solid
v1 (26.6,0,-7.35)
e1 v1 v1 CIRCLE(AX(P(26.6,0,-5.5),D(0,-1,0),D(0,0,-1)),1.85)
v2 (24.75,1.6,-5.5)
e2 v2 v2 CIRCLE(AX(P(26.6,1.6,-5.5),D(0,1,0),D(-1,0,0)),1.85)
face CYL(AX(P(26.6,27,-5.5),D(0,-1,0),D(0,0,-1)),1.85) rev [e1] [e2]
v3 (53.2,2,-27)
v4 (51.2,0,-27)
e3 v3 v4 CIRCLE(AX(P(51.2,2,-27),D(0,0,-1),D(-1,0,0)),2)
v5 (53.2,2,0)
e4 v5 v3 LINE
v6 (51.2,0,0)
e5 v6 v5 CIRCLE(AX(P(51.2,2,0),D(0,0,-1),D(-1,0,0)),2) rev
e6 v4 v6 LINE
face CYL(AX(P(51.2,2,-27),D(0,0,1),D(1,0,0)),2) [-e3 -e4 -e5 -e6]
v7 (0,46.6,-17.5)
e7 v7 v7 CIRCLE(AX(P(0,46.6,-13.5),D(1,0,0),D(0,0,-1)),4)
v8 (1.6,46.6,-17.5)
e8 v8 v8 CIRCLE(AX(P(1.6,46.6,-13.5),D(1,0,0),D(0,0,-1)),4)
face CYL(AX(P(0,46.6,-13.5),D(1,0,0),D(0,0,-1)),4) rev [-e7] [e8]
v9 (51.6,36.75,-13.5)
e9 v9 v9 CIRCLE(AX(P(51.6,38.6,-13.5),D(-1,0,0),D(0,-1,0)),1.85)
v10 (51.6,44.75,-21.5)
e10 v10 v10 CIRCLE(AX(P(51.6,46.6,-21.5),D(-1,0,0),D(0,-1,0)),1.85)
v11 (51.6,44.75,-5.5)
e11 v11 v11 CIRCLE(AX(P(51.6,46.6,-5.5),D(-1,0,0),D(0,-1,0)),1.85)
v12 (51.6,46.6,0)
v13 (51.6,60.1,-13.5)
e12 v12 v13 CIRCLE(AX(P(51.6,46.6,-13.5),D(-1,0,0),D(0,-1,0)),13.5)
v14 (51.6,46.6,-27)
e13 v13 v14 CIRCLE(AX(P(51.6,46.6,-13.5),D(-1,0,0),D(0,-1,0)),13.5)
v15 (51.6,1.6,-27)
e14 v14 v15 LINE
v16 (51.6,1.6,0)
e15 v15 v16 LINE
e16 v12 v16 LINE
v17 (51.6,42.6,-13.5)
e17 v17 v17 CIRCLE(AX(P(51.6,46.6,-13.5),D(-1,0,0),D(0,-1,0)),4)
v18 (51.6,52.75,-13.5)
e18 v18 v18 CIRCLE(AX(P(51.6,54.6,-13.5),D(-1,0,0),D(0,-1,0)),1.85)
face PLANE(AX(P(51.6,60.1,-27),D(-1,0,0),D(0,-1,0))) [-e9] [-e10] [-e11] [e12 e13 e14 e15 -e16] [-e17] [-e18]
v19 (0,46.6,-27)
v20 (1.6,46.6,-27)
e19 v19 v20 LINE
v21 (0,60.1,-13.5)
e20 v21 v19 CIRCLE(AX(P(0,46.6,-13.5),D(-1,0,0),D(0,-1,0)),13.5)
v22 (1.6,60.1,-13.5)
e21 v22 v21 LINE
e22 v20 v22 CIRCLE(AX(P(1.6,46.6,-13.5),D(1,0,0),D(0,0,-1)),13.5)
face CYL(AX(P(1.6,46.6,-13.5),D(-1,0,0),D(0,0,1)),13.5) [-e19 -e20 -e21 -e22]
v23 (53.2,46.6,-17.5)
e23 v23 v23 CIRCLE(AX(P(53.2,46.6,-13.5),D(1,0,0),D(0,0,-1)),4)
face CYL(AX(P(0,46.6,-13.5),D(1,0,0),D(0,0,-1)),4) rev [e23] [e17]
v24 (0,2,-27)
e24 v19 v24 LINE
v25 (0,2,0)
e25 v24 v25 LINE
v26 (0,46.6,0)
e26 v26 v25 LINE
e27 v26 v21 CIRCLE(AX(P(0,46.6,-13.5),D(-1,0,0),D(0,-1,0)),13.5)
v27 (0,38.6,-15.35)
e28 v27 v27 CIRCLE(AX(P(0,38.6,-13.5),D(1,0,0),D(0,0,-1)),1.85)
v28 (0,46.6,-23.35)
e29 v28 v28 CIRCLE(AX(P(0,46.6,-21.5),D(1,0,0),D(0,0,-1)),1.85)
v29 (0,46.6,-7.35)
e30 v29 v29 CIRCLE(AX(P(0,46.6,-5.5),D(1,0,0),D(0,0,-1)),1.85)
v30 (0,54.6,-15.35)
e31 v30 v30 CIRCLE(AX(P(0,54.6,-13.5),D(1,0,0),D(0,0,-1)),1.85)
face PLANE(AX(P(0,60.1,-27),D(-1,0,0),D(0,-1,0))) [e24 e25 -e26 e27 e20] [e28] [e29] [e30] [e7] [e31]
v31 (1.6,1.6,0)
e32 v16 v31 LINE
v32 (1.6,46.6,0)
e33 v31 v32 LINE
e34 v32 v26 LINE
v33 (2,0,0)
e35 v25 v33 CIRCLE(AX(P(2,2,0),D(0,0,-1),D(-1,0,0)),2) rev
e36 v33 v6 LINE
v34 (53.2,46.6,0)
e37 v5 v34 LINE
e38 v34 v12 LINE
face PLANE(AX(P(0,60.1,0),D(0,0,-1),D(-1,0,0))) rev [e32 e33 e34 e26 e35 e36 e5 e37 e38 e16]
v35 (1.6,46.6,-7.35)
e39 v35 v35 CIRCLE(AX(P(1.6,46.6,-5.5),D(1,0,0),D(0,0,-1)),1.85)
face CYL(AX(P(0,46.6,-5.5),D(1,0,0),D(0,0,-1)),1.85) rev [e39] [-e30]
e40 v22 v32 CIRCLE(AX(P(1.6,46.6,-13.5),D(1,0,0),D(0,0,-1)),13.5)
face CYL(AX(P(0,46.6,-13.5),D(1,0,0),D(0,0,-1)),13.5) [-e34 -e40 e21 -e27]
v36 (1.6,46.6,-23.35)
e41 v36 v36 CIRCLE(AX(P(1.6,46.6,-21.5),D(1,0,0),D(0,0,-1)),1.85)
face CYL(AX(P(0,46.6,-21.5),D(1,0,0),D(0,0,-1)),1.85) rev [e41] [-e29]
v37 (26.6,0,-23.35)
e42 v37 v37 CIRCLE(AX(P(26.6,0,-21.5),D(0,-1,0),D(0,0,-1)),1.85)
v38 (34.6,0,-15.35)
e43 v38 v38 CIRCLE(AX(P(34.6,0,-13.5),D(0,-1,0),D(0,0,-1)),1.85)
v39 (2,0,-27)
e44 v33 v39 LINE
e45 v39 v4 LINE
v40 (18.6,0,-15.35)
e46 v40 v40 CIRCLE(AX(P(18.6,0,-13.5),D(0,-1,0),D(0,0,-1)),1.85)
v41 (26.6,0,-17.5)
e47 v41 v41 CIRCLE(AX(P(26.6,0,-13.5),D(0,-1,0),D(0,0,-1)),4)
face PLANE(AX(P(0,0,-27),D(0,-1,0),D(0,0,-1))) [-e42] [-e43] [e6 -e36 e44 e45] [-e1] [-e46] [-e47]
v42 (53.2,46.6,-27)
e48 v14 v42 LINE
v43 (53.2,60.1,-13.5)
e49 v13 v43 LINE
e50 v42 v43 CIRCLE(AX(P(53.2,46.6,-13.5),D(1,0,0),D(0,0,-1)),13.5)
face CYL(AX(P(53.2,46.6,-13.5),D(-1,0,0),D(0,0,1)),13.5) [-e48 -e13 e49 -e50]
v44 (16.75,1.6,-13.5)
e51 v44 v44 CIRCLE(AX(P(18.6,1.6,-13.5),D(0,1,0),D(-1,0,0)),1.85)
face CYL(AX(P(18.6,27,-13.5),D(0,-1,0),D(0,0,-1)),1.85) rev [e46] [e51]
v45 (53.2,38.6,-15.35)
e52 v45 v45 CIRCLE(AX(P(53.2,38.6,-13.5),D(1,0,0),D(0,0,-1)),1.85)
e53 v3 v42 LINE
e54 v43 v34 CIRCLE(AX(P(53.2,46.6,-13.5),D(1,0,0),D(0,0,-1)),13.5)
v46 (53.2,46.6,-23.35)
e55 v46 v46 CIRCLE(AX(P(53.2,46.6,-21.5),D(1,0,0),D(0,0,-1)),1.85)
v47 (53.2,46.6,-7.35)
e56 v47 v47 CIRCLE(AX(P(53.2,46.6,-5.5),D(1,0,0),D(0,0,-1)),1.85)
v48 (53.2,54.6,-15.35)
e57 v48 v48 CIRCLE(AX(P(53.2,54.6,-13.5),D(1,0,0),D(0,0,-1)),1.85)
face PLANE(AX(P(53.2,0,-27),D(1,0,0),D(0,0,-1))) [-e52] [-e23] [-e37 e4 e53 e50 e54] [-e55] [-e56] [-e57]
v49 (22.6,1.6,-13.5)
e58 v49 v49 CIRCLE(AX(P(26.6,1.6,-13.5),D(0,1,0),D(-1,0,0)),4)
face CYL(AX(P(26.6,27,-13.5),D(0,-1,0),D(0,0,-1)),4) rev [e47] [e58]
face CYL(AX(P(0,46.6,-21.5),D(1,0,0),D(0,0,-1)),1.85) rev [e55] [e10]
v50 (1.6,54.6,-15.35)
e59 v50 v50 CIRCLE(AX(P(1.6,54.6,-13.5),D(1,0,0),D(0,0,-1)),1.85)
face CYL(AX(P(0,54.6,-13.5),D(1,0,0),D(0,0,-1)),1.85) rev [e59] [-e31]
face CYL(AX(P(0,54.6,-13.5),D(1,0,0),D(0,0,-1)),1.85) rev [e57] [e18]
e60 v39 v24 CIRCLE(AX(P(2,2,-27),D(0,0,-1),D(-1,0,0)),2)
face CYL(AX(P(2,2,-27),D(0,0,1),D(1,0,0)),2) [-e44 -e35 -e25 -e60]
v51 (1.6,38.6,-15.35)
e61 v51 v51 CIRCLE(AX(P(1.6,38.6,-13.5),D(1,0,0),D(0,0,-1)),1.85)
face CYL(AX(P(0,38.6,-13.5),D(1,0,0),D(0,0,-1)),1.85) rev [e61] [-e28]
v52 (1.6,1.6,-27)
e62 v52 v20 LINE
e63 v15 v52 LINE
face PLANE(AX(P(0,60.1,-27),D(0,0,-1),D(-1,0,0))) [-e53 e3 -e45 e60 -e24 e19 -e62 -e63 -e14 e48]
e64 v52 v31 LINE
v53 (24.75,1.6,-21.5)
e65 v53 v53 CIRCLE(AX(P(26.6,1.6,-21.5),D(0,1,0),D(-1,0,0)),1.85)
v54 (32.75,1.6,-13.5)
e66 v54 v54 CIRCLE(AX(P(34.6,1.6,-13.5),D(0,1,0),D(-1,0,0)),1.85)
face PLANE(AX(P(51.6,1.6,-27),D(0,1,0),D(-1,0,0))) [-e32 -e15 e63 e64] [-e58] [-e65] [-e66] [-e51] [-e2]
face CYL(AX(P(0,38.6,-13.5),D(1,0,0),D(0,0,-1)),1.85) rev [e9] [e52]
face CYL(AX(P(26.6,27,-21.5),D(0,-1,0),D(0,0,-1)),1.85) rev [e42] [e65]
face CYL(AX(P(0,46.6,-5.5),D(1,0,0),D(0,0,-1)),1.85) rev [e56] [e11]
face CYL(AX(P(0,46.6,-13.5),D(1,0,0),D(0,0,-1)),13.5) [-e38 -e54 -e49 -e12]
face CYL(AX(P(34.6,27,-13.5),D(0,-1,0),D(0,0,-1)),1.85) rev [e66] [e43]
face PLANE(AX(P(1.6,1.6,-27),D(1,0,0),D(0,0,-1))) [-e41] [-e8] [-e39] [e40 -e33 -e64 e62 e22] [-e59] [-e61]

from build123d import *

# Parameters (mm, degrees)
EXTRUDE1_DEPTH           = 27
FILLET2_R                = 13.5
FILLET3_R                = 13.5
FILLET4_R                = 13.5
FILLET5_R                = 13.5
CUT_EXTRUDE1_START       = -53.2
CUT_EXTRUDE1_OUTLINE_R   = 4
CUT_EXTRUDE1_OUTLINE_R_2 = 1.85
CUT_EXTRUDE1_DEPTH       = 53.2
CUT_EXTRUDE2_START       = -1.6
CUT_EXTRUDE2_OUTLINE_R   = 4
CUT_EXTRUDE2_OUTLINE_R_2 = 1.85
CUT_EXTRUDE2_DEPTH       = 1.6
FILLET6_R                = 2
FILLET7_R                = 2


# Read off the part's stored shape, not the designer's step: Cut-Extrude1, Cut-Extrude2
with BuildPart() as part:
    # Sketch1 → Extrude1 (new body)
    with BuildSketch(Plane.XY):
        Polygon((0, 0), (53.2, 0), (53.2, 60.1), (51.6, 60.1), (51.6, 1.6), (1.6, 1.6), (1.6, 60.1), (0, 60.1), align=None)
    extrude(amount=-EXTRUDE1_DEPTH)

    # Fillet2
    fillet2_edges = [part.edges().sort_by_distance(p)[0] for p in [
        (52.4, 60.1, 0),
    ]]
    fillet(fillet2_edges, radius=FILLET2_R)

    # Fillet3
    fillet3_edges = [part.edges().sort_by_distance(p)[0] for p in [
        (52.4, 60.1, -27),
    ]]
    fillet(fillet3_edges, radius=FILLET3_R - 0.0001)  # a hair under: the kernel refuses the full size

    # Fillet4
    fillet4_edges = [part.edges().sort_by_distance(p)[0] for p in [
        (0.8, 60.1, -27),
    ]]
    fillet(fillet4_edges, radius=FILLET4_R)

    # Fillet5
    fillet5_edges = [part.edges().sort_by_distance(p)[0] for p in [
        (0.8, 60.1, 0),
    ]]
    fillet(fillet5_edges, radius=FILLET5_R - 0.0001)  # a hair under: the kernel refuses the full size

    # Cut-Extrude1 outline → Cut-Extrude1 (cut)
    with BuildSketch(Plane(origin=(53.2, 0, 0), x_dir=(0, 0, -1), z_dir=(1, 0, 0)).offset(CUT_EXTRUDE1_START)):
        with Locations((13.5, 46.6)):
            Circle(CUT_EXTRUDE1_OUTLINE_R)
        with Locations((21.5, 46.6)):
            Circle(CUT_EXTRUDE1_OUTLINE_R_2)
        with Locations((5.5, 46.6)):
            Circle(CUT_EXTRUDE1_OUTLINE_R_2)
        with Locations((13.5, 38.6)):
            Circle(CUT_EXTRUDE1_OUTLINE_R_2)
        with Locations((13.5, 54.6)):
            Circle(CUT_EXTRUDE1_OUTLINE_R_2)
    extrude(amount=CUT_EXTRUDE1_DEPTH, mode=Mode.SUBTRACT)

    # Cut-Extrude2 outline → Cut-Extrude2 (cut)
    with BuildSketch(Plane.XZ.offset(CUT_EXTRUDE2_START)):
        with Locations((26.6, -13.5)):
            Circle(CUT_EXTRUDE2_OUTLINE_R)
        with Locations((34.6, -13.5)):
            Circle(CUT_EXTRUDE2_OUTLINE_R_2)
        with Locations((18.6, -13.5)):
            Circle(CUT_EXTRUDE2_OUTLINE_R_2)
        with Locations((26.6, -21.5)):
            Circle(CUT_EXTRUDE2_OUTLINE_R_2)
        with Locations((26.6, -5.5)):
            Circle(CUT_EXTRUDE2_OUTLINE_R_2)
    extrude(amount=CUT_EXTRUDE2_DEPTH, mode=Mode.SUBTRACT)

    # Fillet6
    fillet6_edges = [part.edges().sort_by_distance(p)[0] for p in [
        (53.2, 0, -13.5),
    ]]
    fillet(fillet6_edges, radius=FILLET6_R)

    # Fillet7
    fillet7_edges = [part.edges().sort_by_distance(p)[0] for p in [
        (0, 0, -13.5),
    ]]
    fillet(fillet7_edges, radius=FILLET7_R)


solid = part.part
